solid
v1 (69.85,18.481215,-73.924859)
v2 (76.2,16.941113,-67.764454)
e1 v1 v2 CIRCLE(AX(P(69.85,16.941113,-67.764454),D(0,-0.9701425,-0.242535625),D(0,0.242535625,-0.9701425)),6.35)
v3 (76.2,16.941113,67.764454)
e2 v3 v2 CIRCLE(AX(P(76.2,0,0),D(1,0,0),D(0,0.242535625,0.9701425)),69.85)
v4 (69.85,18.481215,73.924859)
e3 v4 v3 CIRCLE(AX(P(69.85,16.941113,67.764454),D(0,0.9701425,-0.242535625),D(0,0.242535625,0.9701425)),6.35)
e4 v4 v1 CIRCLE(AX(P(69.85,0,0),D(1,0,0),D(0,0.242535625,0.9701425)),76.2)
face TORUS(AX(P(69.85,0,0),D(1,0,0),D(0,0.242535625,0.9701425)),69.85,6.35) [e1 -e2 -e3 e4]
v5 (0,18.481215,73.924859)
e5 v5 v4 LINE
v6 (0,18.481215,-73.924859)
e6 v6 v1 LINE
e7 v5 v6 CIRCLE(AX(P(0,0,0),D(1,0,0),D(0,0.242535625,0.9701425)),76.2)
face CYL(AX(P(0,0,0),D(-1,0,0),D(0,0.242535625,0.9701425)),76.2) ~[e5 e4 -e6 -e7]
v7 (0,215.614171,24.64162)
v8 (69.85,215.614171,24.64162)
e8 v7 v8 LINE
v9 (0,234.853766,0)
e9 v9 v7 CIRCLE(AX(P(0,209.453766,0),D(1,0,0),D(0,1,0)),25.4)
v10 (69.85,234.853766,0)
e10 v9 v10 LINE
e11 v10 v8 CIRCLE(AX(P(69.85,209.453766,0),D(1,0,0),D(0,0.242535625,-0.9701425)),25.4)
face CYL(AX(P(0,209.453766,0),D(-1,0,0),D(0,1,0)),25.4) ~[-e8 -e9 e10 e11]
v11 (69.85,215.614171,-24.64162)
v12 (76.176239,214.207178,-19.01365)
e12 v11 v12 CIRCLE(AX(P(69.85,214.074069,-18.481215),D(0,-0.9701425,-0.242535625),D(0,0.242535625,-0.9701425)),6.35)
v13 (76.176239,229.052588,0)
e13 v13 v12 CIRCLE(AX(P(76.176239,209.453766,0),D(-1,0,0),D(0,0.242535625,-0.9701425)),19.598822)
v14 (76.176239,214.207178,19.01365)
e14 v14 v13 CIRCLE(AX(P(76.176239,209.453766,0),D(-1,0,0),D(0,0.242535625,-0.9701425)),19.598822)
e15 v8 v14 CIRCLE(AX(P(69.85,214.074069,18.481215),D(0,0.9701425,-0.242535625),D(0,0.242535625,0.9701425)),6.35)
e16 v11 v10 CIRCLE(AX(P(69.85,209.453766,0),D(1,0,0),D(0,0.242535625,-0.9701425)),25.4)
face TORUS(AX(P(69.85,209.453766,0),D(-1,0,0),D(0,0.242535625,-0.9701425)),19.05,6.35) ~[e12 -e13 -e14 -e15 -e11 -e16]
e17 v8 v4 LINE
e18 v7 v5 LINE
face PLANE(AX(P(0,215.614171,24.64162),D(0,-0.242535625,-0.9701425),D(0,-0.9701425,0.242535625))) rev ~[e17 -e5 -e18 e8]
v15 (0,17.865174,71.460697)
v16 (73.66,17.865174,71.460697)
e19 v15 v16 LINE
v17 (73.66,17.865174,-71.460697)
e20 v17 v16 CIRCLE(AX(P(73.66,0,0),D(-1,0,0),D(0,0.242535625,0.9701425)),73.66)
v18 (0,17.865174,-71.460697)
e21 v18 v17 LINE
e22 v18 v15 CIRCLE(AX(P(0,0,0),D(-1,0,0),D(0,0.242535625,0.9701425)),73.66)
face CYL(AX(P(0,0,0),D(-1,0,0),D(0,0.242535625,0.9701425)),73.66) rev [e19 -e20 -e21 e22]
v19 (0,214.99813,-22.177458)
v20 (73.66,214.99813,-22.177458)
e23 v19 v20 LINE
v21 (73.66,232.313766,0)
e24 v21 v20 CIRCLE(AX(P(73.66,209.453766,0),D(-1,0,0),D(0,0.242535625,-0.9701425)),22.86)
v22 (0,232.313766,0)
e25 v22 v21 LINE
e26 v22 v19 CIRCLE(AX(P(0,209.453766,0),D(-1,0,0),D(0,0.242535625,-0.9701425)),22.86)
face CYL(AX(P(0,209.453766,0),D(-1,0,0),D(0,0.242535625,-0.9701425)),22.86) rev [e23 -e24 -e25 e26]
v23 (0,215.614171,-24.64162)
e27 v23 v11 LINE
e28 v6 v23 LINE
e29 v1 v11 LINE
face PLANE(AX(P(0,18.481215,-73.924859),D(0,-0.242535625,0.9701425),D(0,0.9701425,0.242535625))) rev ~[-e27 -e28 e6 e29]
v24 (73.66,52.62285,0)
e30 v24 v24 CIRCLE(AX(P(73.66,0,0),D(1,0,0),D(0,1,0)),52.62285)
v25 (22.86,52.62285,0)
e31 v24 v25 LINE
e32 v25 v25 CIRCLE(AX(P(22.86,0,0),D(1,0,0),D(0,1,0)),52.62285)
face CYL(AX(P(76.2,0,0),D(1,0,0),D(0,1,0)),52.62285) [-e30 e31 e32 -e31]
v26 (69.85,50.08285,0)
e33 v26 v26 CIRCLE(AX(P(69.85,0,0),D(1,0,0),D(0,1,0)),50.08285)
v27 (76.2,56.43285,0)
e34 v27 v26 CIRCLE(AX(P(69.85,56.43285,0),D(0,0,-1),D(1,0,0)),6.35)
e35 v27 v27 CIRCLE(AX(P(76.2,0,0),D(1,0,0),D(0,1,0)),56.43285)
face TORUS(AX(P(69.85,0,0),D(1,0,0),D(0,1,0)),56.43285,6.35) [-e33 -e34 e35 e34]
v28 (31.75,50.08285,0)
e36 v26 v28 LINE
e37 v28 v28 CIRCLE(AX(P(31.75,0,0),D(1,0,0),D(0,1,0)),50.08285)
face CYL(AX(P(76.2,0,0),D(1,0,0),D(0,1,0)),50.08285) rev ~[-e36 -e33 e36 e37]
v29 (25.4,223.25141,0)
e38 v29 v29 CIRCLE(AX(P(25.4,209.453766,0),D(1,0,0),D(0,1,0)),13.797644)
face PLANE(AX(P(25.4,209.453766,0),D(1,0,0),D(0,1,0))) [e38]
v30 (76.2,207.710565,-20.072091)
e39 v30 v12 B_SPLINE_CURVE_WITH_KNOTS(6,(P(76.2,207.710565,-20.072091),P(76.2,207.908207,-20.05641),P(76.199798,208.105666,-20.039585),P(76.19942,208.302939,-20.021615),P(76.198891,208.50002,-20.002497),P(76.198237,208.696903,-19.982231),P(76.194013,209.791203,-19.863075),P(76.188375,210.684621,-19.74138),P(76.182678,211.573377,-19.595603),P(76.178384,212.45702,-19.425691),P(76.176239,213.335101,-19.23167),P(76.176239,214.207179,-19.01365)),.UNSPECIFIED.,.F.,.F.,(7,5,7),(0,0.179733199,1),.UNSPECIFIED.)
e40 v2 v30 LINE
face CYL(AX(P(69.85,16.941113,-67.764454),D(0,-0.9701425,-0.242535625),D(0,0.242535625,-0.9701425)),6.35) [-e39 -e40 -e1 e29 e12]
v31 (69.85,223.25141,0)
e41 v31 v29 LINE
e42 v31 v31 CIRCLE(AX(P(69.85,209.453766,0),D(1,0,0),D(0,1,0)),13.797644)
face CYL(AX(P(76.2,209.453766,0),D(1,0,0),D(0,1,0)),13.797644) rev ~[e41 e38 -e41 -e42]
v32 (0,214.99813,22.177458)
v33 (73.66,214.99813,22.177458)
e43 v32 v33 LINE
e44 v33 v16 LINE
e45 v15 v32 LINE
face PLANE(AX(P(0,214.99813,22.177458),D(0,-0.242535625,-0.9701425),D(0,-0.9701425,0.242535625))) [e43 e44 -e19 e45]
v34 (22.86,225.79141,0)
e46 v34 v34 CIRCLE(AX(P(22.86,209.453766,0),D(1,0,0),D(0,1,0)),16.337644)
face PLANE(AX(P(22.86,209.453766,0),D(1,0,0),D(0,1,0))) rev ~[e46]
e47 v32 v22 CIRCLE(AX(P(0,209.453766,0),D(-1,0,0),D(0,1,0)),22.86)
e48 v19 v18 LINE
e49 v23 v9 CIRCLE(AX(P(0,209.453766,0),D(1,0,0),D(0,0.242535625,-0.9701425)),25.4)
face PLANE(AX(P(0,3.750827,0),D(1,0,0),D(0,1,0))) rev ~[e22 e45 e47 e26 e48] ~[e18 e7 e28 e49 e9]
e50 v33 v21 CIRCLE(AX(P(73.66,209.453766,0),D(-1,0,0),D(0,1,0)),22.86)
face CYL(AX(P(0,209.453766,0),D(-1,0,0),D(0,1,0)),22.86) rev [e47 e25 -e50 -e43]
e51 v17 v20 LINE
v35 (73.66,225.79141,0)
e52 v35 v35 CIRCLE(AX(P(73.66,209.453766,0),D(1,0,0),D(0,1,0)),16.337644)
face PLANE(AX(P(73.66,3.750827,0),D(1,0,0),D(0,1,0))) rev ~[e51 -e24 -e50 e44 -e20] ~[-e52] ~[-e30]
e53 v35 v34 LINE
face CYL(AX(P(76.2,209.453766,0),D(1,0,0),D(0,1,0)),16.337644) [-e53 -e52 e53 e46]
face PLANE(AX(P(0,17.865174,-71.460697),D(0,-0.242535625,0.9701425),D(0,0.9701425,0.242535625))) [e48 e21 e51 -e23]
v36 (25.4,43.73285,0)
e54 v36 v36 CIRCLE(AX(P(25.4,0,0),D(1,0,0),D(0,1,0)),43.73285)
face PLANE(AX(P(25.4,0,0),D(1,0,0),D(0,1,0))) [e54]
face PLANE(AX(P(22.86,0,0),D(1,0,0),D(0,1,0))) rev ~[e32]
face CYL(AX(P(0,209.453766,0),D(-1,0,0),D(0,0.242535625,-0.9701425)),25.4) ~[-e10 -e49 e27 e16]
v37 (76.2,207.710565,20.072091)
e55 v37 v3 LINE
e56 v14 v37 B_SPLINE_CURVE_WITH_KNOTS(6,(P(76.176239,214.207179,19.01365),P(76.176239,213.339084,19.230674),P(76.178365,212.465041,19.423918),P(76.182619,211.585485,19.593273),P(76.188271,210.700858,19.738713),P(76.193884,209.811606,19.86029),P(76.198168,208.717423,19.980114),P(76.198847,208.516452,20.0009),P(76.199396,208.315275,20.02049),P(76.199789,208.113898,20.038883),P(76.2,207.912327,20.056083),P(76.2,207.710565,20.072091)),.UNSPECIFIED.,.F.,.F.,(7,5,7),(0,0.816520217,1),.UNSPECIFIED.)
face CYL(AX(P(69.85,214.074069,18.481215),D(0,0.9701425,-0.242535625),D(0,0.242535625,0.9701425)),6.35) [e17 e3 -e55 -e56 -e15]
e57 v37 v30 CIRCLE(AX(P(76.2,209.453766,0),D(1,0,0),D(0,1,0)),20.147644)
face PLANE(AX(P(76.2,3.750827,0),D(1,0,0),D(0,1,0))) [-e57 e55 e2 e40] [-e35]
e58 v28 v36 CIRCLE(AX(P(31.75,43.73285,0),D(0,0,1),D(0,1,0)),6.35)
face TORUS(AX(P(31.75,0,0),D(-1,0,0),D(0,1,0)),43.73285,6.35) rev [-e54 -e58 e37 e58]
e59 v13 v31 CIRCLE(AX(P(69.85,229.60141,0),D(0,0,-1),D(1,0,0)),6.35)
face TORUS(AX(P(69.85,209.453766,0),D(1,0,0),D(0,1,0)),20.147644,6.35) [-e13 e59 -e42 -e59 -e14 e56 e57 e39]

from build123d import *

# Parameters (mm, degrees)
F1_DEPTH     = 76.2
F2_R         = 50.0828504331
F2_R_2       = 13.7976444657
F3_DEPTH     = 50.8
F4_T         = -2.54
F5_T3_DEPTH  = 203.2
F5_T5_DEPTH  = 203.2
F5_T8_ANGLE  = 208.0724869359
F5_T10_ANGLE = 151.9275130641


# Not quite as in the source:
# - a fillet or chamfer that OpenCascade refuses, or shapes differently, is made with other operations: its cross-section is extruded or revolved along the edge and cut away or added


with BuildPart() as f1:
    # F0 (on Right) → F1 (new body)
    with BuildSketch(Plane.YZ):
        with BuildLine():
            ThreePointArc((18.4812146278, -73.9248585111), (60.0612543768, -46.8944103565), (76.2, 0))
            ThreePointArc((76.2, 0), (60.0612543768, 46.8944103565), (18.4812146278, 73.9248585111))
            ThreePointArc((18.4812146278, 73.9248585111), (-76.2, 0), (18.4812146278, -73.9248585111))
        make_face()
        with BuildLine():
            ThreePointArc((18.4812146278, 73.9248585111), (60.0612543768, 46.8944103565), (76.2, 0))
            ThreePointArc((76.2, 0), (60.0612543768, -46.8944103565), (18.4812146278, -73.9248585111))
            Line((18.4812146278, -73.9248585111), (215.6141706573, -24.6416195037))
            ThreePointArc((215.6141706573, -24.6416195037), (184.0537657814, 0), (215.6141706573, 24.6416195037))
            Line((215.6141706573, 24.6416195037), (18.4812146278, 73.9248585111))
        make_face()
        with BuildLine():
            ThreePointArc((234.8537657814, 0), (229.474183907, 15.6314701188), (215.6141706573, 24.6416195037))
            ThreePointArc((215.6141706573, 24.6416195037), (184.0537657814, 0), (215.6141706573, -24.6416195037))
            ThreePointArc((215.6141706573, -24.6416195037), (229.474183907, -15.6314701188), (234.8537657814, 0))
        make_face()
    extrude(amount=F1_DEPTH)

    # F2 (on face) → F3 (cut)
    with BuildSketch(Plane.YZ.offset(76.2)):
        Circle(F2_R)
        with Locations((209.4537657814, 0)):
            Circle(F2_R_2)
    extrude(amount=-F3_DEPTH, mode=Mode.SUBTRACT)

    # F4
    f4_openings = [f1.faces().sort_by_distance(p)[0] for p in [
        (0, 57.51924, 0),
    ]]
    offset(amount=F4_T, openings=f4_openings, kind=Kind.INTERSECTION)

    # F5: fillet of radius 6.35 on 7 edges, made by hand

    # F5_s1 → F5_t2 (revolve)
    with BuildSketch(Plane.XY):
        with BuildLine():
            ThreePointArc((31.75, 50.0828504331), (27.2598719395, 48.2229784936), (25.4, 43.7328504331))
            Line((25.4, 43.7328504331), (25.4, 50.0828504331))
            Line((25.4, 50.0828504331), (31.75, 50.0828504331))
        make_face()
    revolve(axis=Axis((25.4, 0, 0), (1, 0, 0)))

    # F5_s4 → F5_t3 (cut)
    with BuildSketch(Plane(origin=(0, 197.1329560295, -49.2832390074), x_dir=(1, 0, 0), z_dir=(0, -0.9701425001, 0.242535625))):
        with BuildLine():
            ThreePointArc((69.85, 76.2), (74.3401280605, 74.3401280605), (76.2, 69.85))
            Line((76.2, 69.85), (76.2, 76.2))
            Line((76.2, 76.2), (69.85, 76.2))
        make_face()
    extrude(amount=F5_T3_DEPTH, mode=Mode.SUBTRACT)

    # F5_s6 → F5_t5 (cut)
    with BuildSketch(Plane(origin=(0, 0, 0), x_dir=(1, 0, 0), z_dir=(0, 0.9701425001, 0.242535625))):
        with BuildLine():
            ThreePointArc((69.85, 76.2), (74.3401280605, 74.3401280605), (76.2, 69.85))
            Line((76.2, 69.85), (76.2, 76.2))
            Line((76.2, 76.2), (69.85, 76.2))
        make_face()
    extrude(amount=F5_T5_DEPTH, mode=Mode.SUBTRACT)

    # F5_s7 → F5_t8 (revolve, cut)
    with BuildSketch(Plane(origin=(0, 0, 0), x_dir=(1, 0, 0), z_dir=(0, 0.9701425001, -0.242535625))):
        with BuildLine():
            ThreePointArc((69.85, -76.2), (74.3401280605, -74.3401280605), (76.2, -69.85))
            Line((76.2, -69.85), (76.2, -76.2))
            Line((76.2, -76.2), (69.85, -76.2))
        make_face()
    revolve(axis=Axis((76.2, 0, 0), (1, 0, 0)), revolution_arc=F5_T8_ANGLE, mode=Mode.SUBTRACT)

    # F5_s9 → F5_t10 (revolve, cut)
    with BuildSketch(Plane(origin=(0, 197.1329560295, 49.2832390074), x_dir=(1, 0, 0), z_dir=(0, -0.9701425001, -0.242535625))):
        with BuildLine():
            ThreePointArc((76.2, -69.85), (74.3401280605, -74.3401280605), (69.85, -76.2))
            Line((69.85, -76.2), (76.2, -76.2))
            Line((76.2, -76.2), (76.2, -69.85))
        make_face()
    revolve(axis=Axis((76.2, 209.4537657814, 0), (1, 0, 0)), revolution_arc=F5_T10_ANGLE, mode=Mode.SUBTRACT)

    # F5_s11 → F5_t12 (revolve, cut)
    with BuildSketch(Plane.XY):
        with BuildLine():
            ThreePointArc((76.2, 56.4328504331), (74.3401280605, 51.9427223726), (69.85, 50.0828504331))
            Line((69.85, 50.0828504331), (76.2, 50.0828504331))
            Line((76.2, 50.0828504331), (76.2, 56.4328504331))
        make_face()
    revolve(axis=Axis((76.2, 0, 0), (1, 0, 0)), mode=Mode.SUBTRACT)

    # F5_s13 → F5_t14 (revolve, cut)
    with BuildSketch(Plane.XY):
        with BuildLine():
            ThreePointArc((76.2, 229.6014102471), (74.3401280605, 225.1112821866), (69.85, 223.2514102471))
            Line((69.85, 223.2514102471), (76.2, 223.2514102471))
            Line((76.2, 223.2514102471), (76.2, 229.6014102471))
        make_face()
    revolve(axis=Axis((76.2, 209.4537657814, 0), (1, 0, 0)), mode=Mode.SUBTRACT)


solid = f1.part
